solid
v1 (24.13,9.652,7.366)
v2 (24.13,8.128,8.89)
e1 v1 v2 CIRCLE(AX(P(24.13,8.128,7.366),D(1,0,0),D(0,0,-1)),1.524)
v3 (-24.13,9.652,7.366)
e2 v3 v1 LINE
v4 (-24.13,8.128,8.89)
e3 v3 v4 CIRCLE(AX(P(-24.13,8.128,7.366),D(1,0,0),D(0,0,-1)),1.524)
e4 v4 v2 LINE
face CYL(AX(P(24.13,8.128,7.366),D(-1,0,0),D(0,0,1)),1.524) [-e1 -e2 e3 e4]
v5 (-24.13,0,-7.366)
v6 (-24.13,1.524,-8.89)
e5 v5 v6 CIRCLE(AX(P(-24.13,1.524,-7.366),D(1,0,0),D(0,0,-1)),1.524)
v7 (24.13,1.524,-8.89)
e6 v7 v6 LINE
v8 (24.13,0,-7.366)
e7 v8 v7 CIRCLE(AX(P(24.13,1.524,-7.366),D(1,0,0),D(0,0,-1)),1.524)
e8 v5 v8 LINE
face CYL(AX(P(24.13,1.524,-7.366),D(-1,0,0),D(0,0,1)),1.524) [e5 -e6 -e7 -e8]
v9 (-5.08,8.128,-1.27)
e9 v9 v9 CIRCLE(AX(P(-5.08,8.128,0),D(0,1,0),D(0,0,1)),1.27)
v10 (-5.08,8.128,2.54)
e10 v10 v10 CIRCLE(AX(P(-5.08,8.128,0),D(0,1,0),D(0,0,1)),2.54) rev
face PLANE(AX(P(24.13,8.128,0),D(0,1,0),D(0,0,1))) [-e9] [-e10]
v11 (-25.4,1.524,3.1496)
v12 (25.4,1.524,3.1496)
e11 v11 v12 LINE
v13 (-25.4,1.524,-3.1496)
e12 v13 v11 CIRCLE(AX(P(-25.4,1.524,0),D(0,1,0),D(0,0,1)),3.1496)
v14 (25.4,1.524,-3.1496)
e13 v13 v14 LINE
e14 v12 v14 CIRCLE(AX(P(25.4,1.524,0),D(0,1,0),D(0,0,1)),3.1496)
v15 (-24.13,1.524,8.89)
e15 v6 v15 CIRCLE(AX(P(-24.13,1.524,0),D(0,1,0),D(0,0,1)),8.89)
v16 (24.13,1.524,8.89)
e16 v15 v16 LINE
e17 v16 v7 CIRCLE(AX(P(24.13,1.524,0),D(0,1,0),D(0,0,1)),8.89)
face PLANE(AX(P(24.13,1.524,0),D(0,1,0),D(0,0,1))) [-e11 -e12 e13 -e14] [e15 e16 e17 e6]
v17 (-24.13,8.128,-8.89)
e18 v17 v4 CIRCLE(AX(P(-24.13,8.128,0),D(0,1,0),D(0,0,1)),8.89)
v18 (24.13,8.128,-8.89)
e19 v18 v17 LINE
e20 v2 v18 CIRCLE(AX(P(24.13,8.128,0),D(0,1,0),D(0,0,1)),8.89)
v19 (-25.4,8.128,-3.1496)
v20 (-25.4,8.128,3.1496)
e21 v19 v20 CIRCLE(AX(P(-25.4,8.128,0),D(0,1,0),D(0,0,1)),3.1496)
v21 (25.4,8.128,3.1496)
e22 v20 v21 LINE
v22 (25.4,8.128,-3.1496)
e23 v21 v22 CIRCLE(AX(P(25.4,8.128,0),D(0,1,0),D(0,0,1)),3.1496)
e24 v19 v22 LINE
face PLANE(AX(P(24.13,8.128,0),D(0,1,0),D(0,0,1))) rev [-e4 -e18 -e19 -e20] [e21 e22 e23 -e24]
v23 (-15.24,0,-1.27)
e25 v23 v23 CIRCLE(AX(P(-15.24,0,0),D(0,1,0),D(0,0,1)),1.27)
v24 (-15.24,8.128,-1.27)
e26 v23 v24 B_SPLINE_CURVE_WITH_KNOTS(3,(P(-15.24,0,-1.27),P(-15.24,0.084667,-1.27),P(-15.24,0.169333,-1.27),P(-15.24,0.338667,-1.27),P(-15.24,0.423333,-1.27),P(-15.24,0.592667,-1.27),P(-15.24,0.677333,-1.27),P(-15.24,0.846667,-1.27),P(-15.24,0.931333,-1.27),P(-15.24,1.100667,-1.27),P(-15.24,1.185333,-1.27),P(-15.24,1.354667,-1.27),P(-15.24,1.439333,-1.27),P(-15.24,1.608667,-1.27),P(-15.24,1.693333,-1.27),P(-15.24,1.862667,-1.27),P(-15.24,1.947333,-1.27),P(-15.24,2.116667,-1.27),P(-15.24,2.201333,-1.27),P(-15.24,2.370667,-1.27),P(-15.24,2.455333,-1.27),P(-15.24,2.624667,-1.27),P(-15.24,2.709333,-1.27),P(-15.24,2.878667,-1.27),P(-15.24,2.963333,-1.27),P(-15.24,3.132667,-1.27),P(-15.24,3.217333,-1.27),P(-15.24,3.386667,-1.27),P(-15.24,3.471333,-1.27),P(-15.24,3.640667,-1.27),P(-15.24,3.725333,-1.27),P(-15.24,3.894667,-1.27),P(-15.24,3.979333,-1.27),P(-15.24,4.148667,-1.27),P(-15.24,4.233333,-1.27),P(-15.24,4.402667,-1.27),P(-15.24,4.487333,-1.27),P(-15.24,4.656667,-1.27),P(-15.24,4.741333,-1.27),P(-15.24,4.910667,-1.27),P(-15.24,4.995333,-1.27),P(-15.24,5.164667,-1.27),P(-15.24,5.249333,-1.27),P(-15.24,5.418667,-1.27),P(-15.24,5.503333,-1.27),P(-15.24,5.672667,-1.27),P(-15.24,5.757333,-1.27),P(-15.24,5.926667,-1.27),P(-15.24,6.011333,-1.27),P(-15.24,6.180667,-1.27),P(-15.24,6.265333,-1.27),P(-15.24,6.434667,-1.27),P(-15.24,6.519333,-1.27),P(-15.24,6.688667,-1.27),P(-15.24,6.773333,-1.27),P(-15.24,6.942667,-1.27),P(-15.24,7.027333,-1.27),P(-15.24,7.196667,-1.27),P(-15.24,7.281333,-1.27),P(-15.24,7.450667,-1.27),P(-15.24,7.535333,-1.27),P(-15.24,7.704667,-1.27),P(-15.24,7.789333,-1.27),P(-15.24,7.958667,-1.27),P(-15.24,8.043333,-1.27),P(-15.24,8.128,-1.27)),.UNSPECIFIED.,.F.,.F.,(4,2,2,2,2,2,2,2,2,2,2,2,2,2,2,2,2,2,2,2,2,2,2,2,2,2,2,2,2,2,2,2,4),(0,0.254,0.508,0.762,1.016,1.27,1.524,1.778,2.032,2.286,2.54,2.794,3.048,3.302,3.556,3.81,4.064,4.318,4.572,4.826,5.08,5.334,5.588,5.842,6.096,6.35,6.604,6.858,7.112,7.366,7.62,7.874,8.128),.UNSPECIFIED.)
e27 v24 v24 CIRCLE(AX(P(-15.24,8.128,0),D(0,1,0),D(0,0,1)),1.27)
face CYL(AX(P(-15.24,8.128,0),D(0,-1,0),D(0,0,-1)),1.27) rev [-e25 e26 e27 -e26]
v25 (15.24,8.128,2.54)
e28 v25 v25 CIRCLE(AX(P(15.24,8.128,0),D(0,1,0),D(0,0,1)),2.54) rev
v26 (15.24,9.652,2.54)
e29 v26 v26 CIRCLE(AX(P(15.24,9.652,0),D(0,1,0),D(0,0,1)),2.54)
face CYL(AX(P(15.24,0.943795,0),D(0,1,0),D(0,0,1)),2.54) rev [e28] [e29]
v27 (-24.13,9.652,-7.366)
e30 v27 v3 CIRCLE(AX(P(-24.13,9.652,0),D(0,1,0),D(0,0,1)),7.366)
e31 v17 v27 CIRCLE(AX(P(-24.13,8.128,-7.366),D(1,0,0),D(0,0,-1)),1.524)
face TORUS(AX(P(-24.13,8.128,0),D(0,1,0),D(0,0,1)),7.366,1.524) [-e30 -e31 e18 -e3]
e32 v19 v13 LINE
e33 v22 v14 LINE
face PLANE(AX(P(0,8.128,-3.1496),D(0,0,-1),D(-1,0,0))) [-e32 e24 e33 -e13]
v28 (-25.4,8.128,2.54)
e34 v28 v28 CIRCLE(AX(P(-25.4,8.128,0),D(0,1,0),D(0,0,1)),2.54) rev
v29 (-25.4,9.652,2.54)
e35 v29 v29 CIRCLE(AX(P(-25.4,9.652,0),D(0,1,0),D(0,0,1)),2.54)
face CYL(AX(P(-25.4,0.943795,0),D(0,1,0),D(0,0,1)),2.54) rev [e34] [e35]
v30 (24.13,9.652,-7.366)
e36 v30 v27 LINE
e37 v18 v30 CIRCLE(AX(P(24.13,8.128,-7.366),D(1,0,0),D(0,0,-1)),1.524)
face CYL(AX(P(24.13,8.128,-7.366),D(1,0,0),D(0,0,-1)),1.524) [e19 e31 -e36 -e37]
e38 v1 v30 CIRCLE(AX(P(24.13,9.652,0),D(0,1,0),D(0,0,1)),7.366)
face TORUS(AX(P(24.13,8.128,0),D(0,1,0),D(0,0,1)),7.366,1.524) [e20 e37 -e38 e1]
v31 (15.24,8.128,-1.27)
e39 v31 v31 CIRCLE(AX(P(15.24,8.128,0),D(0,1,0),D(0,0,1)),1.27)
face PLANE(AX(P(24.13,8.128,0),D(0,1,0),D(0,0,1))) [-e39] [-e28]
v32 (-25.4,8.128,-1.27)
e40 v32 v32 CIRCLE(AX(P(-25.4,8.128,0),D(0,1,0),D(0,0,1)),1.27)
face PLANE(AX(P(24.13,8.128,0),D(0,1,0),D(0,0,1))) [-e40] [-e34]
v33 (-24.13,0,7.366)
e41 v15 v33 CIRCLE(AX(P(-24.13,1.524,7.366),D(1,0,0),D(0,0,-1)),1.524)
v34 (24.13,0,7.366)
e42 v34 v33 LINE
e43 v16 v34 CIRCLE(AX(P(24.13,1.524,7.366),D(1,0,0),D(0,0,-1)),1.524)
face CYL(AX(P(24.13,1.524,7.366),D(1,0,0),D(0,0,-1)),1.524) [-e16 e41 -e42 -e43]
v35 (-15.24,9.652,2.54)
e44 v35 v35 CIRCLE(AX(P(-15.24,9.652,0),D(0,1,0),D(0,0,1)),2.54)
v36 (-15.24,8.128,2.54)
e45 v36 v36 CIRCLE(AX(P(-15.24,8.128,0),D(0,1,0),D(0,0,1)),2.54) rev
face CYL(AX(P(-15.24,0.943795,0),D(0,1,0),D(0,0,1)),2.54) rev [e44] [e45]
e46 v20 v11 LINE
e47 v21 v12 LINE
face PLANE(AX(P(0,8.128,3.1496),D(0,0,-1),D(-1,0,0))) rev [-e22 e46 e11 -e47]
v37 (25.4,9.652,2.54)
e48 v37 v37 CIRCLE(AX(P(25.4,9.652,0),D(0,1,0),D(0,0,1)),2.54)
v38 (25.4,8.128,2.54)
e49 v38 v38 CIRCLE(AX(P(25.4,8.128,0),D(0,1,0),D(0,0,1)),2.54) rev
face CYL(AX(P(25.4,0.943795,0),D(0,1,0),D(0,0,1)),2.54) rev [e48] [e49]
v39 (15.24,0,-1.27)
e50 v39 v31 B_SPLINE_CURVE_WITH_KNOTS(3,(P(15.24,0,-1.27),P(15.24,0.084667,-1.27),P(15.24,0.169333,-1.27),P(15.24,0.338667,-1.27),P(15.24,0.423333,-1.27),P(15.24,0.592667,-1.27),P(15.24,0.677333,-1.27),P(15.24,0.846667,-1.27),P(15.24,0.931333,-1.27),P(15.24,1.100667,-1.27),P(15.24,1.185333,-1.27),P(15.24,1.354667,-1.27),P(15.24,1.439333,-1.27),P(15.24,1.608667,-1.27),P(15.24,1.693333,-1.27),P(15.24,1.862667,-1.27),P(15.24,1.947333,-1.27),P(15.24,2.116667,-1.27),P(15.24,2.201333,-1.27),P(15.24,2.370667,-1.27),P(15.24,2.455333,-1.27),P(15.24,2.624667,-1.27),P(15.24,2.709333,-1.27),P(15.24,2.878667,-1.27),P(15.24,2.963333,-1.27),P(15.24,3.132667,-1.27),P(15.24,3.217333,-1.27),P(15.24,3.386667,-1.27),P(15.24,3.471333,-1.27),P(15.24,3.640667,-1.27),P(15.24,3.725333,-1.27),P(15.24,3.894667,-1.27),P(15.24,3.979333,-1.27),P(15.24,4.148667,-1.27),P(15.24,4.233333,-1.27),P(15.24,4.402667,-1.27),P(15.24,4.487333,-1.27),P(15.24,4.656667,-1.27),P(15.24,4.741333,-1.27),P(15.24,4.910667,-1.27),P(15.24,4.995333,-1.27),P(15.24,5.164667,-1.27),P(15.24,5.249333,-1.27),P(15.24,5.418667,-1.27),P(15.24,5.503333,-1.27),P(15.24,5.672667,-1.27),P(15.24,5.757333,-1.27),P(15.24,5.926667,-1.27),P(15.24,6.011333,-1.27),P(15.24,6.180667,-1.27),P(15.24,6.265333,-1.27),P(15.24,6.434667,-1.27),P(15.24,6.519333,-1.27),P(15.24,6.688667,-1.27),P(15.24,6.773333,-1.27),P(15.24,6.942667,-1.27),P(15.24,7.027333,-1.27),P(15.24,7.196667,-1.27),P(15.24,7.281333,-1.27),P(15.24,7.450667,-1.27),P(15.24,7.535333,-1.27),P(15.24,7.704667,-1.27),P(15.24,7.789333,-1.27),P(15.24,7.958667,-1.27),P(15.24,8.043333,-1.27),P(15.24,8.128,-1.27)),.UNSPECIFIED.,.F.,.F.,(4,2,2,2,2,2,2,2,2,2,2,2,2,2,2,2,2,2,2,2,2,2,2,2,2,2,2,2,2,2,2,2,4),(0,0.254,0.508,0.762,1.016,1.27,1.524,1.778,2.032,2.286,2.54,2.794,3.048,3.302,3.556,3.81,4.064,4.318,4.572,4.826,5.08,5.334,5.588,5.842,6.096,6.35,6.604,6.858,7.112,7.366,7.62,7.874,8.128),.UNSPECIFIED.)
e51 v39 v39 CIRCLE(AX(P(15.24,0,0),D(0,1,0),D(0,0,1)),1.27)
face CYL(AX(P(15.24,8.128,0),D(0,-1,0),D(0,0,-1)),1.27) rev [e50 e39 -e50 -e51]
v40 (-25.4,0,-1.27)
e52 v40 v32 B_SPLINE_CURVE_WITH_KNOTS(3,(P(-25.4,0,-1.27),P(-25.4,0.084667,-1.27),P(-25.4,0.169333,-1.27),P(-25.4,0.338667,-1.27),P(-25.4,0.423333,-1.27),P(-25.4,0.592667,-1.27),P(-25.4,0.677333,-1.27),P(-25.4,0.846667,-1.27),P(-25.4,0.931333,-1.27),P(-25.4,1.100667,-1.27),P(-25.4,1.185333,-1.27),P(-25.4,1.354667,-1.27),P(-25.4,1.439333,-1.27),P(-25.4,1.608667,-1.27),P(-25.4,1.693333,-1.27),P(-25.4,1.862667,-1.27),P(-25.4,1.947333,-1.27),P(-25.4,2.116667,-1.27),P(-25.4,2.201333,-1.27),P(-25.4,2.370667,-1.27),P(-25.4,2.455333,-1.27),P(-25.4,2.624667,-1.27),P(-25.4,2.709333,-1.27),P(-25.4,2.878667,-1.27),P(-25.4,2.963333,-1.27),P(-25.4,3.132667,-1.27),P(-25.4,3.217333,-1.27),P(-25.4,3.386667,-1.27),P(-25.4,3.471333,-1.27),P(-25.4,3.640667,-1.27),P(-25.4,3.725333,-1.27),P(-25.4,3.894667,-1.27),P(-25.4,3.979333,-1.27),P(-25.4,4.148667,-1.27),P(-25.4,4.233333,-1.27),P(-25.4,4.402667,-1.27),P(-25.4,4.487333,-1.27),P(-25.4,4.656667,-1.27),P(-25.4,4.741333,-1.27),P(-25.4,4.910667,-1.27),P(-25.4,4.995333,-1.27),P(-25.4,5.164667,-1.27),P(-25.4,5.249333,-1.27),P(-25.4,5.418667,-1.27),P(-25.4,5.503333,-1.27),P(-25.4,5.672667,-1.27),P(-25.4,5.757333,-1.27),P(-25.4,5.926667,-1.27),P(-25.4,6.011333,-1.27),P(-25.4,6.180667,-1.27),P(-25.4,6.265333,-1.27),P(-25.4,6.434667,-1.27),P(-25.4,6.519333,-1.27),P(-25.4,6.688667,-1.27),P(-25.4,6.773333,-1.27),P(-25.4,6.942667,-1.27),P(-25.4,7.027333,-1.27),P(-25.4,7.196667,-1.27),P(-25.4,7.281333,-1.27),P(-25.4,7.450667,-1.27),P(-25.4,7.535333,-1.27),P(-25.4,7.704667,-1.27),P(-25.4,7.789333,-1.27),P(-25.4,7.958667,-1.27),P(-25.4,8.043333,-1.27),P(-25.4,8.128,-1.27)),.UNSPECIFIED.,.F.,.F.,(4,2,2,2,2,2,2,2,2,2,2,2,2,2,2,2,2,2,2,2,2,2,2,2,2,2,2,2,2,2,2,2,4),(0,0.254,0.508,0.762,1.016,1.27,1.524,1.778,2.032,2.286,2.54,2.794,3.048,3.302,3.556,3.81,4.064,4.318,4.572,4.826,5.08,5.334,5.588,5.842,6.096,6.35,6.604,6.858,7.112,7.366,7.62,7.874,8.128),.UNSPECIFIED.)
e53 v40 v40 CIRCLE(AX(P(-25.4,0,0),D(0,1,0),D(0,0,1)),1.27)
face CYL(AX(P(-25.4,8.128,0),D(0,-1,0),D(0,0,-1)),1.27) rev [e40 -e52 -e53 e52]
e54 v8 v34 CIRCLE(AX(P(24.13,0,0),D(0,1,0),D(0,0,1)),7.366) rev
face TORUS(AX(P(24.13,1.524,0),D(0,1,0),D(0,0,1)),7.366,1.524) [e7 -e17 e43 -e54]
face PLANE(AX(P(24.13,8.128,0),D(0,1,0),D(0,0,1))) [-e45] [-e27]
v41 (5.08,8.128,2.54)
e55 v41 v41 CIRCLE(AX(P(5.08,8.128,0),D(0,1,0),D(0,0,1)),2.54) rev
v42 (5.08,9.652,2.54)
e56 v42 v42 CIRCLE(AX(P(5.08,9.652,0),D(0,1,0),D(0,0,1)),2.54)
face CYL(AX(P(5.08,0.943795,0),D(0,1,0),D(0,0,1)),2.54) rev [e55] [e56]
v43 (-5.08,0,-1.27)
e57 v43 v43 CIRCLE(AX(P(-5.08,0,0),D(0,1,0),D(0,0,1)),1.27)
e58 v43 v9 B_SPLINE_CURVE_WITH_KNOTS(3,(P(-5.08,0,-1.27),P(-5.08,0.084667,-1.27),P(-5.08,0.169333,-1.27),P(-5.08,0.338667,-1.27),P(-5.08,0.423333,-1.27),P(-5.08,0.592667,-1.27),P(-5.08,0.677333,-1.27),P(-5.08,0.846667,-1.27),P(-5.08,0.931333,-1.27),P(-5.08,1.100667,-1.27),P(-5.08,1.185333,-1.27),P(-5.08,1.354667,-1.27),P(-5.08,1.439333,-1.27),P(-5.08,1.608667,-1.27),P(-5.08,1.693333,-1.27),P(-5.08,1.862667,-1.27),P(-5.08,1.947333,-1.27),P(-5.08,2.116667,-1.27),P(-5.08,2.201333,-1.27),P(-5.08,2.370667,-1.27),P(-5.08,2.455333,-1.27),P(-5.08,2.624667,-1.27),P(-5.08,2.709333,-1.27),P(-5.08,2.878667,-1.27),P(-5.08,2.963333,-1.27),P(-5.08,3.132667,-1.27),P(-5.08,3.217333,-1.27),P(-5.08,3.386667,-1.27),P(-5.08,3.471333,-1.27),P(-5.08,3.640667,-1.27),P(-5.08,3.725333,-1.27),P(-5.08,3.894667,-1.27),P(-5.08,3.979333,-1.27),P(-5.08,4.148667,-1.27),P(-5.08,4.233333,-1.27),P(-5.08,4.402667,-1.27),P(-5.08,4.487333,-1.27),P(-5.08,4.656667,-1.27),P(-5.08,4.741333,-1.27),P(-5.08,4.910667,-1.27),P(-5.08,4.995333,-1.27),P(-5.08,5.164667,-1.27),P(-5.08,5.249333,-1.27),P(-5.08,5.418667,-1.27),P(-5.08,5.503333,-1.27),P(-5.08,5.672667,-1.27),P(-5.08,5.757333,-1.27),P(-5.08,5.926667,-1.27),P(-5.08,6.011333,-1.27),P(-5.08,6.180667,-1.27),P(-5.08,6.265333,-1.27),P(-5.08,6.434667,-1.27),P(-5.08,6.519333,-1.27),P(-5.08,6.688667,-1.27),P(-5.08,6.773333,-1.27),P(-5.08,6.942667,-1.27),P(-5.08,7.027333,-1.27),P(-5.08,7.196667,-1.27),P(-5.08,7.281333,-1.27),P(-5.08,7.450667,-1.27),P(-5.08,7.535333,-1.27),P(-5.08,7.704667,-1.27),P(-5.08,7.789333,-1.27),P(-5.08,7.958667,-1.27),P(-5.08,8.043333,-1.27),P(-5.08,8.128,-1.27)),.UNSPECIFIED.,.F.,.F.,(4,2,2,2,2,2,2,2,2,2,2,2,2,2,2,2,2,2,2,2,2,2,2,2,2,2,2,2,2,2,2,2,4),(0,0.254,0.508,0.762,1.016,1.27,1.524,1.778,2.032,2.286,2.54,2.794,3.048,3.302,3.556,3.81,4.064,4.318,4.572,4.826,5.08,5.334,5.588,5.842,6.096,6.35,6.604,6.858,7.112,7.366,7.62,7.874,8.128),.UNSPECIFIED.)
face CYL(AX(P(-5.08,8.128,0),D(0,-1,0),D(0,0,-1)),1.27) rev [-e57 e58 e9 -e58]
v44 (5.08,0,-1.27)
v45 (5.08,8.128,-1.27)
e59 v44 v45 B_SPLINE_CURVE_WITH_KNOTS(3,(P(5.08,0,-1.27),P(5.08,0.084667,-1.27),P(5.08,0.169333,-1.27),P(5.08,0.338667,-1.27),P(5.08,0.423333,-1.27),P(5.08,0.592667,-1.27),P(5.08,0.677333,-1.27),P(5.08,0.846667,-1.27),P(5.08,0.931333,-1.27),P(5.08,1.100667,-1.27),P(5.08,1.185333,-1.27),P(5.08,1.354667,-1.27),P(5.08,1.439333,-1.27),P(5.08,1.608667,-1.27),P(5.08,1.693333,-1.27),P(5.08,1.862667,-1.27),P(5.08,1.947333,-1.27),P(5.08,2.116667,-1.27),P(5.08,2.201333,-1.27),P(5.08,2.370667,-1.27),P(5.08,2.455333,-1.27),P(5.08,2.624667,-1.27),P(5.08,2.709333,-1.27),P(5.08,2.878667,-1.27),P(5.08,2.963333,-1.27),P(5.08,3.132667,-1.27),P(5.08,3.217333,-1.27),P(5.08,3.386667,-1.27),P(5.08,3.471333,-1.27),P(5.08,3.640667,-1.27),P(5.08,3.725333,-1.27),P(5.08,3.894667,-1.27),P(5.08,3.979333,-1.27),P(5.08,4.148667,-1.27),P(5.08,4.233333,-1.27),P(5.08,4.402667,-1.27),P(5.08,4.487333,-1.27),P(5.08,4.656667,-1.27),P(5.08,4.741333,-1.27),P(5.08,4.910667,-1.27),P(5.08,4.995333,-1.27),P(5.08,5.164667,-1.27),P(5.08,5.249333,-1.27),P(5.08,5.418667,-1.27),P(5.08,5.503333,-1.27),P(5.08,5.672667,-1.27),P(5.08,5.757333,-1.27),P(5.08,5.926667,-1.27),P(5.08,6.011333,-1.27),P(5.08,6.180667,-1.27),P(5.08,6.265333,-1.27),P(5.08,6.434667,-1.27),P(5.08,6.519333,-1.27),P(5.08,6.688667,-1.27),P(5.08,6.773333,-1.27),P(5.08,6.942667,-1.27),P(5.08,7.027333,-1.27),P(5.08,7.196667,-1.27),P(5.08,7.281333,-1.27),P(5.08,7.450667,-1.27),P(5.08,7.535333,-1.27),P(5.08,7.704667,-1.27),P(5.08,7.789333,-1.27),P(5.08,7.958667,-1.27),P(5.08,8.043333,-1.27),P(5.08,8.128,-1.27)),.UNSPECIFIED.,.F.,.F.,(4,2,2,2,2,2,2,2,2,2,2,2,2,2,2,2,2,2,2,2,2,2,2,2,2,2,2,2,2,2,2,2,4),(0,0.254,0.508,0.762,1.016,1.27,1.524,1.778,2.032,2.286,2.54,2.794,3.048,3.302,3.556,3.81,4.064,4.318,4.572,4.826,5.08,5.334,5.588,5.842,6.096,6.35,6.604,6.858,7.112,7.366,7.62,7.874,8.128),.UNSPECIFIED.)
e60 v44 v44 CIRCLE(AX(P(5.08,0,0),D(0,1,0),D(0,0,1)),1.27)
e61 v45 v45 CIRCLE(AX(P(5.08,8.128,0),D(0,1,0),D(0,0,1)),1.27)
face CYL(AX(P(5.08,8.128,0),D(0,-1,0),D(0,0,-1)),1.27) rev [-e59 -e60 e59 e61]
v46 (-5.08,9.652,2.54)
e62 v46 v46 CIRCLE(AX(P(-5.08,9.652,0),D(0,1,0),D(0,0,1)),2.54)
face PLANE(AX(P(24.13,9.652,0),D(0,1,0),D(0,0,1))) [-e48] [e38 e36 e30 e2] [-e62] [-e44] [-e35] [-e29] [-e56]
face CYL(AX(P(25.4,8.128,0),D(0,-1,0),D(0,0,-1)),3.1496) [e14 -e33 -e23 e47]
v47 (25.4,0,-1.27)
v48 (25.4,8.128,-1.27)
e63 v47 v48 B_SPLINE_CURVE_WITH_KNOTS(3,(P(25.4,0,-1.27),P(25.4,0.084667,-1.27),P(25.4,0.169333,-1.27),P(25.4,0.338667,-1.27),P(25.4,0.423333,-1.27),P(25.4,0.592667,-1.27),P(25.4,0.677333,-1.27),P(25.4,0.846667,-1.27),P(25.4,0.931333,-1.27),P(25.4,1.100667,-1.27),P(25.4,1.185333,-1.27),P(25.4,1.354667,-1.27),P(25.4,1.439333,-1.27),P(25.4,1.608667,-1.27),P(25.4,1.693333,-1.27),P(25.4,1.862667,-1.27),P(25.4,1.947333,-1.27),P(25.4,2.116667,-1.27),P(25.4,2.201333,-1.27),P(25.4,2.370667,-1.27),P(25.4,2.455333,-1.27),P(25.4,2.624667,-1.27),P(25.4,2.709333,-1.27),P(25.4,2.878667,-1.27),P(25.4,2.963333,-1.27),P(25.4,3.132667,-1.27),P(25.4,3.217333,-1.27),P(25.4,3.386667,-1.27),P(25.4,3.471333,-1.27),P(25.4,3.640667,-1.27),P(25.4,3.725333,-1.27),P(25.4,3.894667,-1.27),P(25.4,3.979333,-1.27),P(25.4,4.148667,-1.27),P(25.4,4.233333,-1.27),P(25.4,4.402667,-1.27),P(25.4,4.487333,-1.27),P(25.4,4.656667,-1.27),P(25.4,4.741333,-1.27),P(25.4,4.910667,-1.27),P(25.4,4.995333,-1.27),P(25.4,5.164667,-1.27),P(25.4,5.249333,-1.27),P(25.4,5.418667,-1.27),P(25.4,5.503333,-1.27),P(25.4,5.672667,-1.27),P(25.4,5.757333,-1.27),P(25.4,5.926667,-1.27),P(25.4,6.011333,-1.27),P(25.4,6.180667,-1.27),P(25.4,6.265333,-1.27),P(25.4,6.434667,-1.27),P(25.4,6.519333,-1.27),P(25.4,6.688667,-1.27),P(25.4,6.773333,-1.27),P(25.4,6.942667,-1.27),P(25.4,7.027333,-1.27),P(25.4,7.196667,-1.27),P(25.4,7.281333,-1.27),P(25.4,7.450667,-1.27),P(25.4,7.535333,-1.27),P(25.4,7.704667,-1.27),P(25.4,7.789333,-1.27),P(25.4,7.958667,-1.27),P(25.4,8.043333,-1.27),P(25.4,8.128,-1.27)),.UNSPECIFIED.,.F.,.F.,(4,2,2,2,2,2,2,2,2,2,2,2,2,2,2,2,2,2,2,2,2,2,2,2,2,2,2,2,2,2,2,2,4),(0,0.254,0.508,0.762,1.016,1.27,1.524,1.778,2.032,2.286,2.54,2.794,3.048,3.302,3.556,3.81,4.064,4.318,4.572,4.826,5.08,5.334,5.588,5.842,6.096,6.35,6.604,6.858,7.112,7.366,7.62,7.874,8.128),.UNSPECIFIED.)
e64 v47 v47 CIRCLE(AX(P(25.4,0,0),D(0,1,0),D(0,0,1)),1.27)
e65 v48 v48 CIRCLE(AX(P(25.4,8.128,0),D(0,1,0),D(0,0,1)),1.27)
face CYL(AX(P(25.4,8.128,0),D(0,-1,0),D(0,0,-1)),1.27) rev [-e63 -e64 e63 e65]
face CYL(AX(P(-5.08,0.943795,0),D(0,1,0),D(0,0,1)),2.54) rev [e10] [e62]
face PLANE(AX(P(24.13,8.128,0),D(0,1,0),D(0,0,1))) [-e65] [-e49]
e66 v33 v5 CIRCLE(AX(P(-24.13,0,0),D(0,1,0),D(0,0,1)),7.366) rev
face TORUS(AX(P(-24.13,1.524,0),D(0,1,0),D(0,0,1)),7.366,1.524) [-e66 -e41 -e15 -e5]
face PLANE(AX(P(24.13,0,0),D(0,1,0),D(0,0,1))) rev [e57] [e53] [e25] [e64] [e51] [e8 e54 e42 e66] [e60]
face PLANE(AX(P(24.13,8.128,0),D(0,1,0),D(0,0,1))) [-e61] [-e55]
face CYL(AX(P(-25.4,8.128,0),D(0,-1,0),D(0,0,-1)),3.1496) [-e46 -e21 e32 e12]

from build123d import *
from build123d.topology import SkipClean

# Parameters (mm, degrees)
BOSS_EXTRUDE1_DEPTH     = 1.524
SKETCH2_R               = 1.2700000000000011
BOSS_EXTRUDE2_DEPTH     = 6.603999999999999
BOSS_EXTRUDE3_DEPTH     = 1.524
FILLET1_R               = 1.524
CUT_EXTRUDE1_DEPTH      = 36.14849760658342
CUT_EXTRUDE1_DEPTH_BACK = 36.14849760658342
SKETCH2_3_R             = 1.2700000000000011
CUT_EXTRUDE2_DEPTH      = 36.53186744318402
CUT_EXTRUDE2_DEPTH_BACK = 1.524
SKETCH4_R               = 2.539999999999999


with BuildPart() as part:
    # Sketch1 → Boss-Extrude1 (new body)
    with BuildSketch(Plane(origin=(0, 0, 0), x_dir=(1, 0, 0), z_dir=(0, 1, 0))):
        with BuildLine():
            Line((24.13, -8.88999999999999), (-24.13, -8.889999999999995))
            ThreePointArc((-24.13, -8.889999999999995), (-33.019999999999996, 2.78e-15), (-24.130000000000003, 8.89))
            Line((-24.130000000000003, 8.89), (24.130000000000003, 8.890000000000006))
            ThreePointArc((24.130000000000003, 8.890000000000006), (33.02, 8.03e-15), (24.13, -8.88999999999999))
        make_face()
    extrude(amount=BOSS_EXTRUDE1_DEPTH)

    # Sketch2 → Boss-Extrude2 (add)
    # profile 1 of 35: a face of its own
    with BuildSketch(Plane(origin=(0, 1.524, 0), x_dir=(1, 0, 0), z_dir=(0, 1, 0))):
        with BuildLine():
            ThreePointArc((-22.64366109485788, 1.5239999999999858), (-23.80000160000079, 2.7129292803167524), (-25.399999999999995, 3.1495999999999986))
            ThreePointArc((-25.399999999999995, 3.1495999999999986), (-28.549599999999995, 3.9e-16), (-25.399999999999995, -3.1495999999999986))
            ThreePointArc((-25.399999999999995, -3.1495999999999986), (-23.80000160000079, -2.7129292803167524), (-22.64366109485788, -1.5239999999999856))
            Line((-22.643661094857876, -1.5239999999999954), (-25.4, -1.5239999999999954))
            Line((-25.4, -1.5239999999999954), (-25.4, -1.2700000000000011))
            ThreePointArc((-25.40000000000001, -1.2700000000000011), (-26.669999999999995, -9.7e-16), (-25.400000000000013, 1.2700000000000011))
            Line((-25.4, 1.2700000000000011), (-25.4, 1.5239999999999954))
            Line((-25.4, 1.5239999999999954), (-22.643661094857876, 1.5239999999999954))
        make_face()
    # profile 2 of 35: a face of its own
    with BuildSketch(Plane(origin=(0, 1.524, 0), x_dir=(1, 0, 0), z_dir=(0, 1, 0))):
        with BuildLine():
            ThreePointArc((-22.250399999999996, 0), (-22.350299590481413, 0.7869609724644511), (-22.64366109485788, 1.5239999999999858))
            Line((-22.643661094857876, 1.5239999999999954), (-25.4, 1.5239999999999954))
            Line((-25.4, 1.5239999999999954), (-25.4, 1.2700000000000011))
            ThreePointArc((-25.400000000000013, 1.2700000000000011), (-24.501974387893085, 0.8980256121069224), (-24.129999999999995, 0))
            ThreePointArc((-24.129999999999995, -3.1e-16), (-24.501974387893085, -0.898025612106922), (-25.40000000000001, -1.2700000000000011))
            Line((-25.4, -1.2700000000000011), (-25.4, -1.5239999999999954))
            Line((-25.4, -1.5239999999999954), (-22.643661094857876, -1.5239999999999954))
            ThreePointArc((-22.64366109485788, -1.5239999999999856), (-22.350299590481413, -0.7869609724644512), (-22.250399999999996, -7.7e-16))
        make_face()
    # profile 3 of 35: a face of its own
    with BuildSketch(Plane(origin=(0, 1.524, 0), x_dir=(1, 0, 0), z_dir=(0, 1, 0))):
        with BuildLine():
            Line((-15.239999999999851, 3.149599999999998), (-25.399999999999995, 3.149599999999998))
            ThreePointArc((-25.399999999999995, 3.1495999999999986), (-23.80000160000079, 2.7129292803167524), (-22.64366109485788, 1.5239999999999858))
            Line((-22.643661094857876, 1.5239999999999954), (-17.99633890514213, 1.5239999999999954))
            ThreePointArc((-17.99633890514212, 1.5239999999999714), (-16.839998399999146, 2.712929280316786), (-15.239999999999851, 3.1496000000000004))
        make_face()
    # profile 4 of 35: a face of its own
    with BuildSketch(Plane(origin=(0, 1.524, 0), x_dir=(1, 0, 0), z_dir=(0, 1, 0))):
        with BuildLine():
            Line((-17.99633890514213, 1.5239999999999954), (-22.643661094857876, 1.5239999999999954))
            ThreePointArc((-22.64366109485788, 1.5239999999999858), (-22.350299590481413, 0.7869609724644511), (-22.250399999999996, 0))
            ThreePointArc((-22.250399999999996, -7.7e-16), (-22.350299590481413, -0.7869609724644512), (-22.64366109485788, -1.5239999999999856))
            Line((-22.643661094857876, -1.5239999999999954), (-17.99633890514213, -1.5239999999999954))
            ThreePointArc((-17.99633890514212, -1.5239999999999694), (-18.389599999999994, 3.9e-16), (-17.99633890514212, 1.5239999999999714))
        make_face()
    # profile 5 of 35: a face of its own
    with BuildSketch(Plane(origin=(0, 1.524, 0), x_dir=(1, 0, 0), z_dir=(0, 1, 0))):
        with BuildLine():
            ThreePointArc((-22.64366109485788, 1.5239999999999858), (-23.80000160000079, 2.7129292803167524), (-25.399999999999995, 3.1495999999999986))
            ThreePointArc((-25.399999999999995, 3.1495999999999986), (-28.549599999999995, 3.9e-16), (-25.399999999999995, -3.1495999999999986))
            ThreePointArc((-25.399999999999995, -3.1495999999999986), (-23.80000160000079, -2.7129292803167524), (-22.64366109485788, -1.5239999999999856))
            Line((-22.643661094857876, -1.5239999999999954), (-25.4, -1.5239999999999954))
            Line((-25.4, -1.5239999999999954), (-25.4, -1.2700000000000011))
            ThreePointArc((-25.40000000000001, -1.2700000000000011), (-26.669999999999995, -9.7e-16), (-25.400000000000013, 1.2700000000000011))
            Line((-25.4, 1.2700000000000011), (-25.4, 1.5239999999999954))
            Line((-25.4, 1.5239999999999954), (-22.643661094857876, 1.5239999999999954))
        make_face()
    # profile 6 of 35: a face of its own
    with BuildSketch(Plane(origin=(0, 1.524, 0), x_dir=(1, 0, 0), z_dir=(0, 1, 0))):
        with BuildLine():
            ThreePointArc((-22.250399999999996, 0), (-22.350299590481413, 0.7869609724644511), (-22.64366109485788, 1.5239999999999858))
            Line((-22.643661094857876, 1.5239999999999954), (-25.4, 1.5239999999999954))
            Line((-25.4, 1.5239999999999954), (-25.4, 1.2700000000000011))
            ThreePointArc((-25.400000000000013, 1.2700000000000011), (-24.501974387893085, 0.8980256121069224), (-24.129999999999995, 0))
            ThreePointArc((-24.129999999999995, -3.1e-16), (-24.501974387893085, -0.898025612106922), (-25.40000000000001, -1.2700000000000011))
            Line((-25.4, -1.2700000000000011), (-25.4, -1.5239999999999954))
            Line((-25.4, -1.5239999999999954), (-22.643661094857876, -1.5239999999999954))
            ThreePointArc((-22.64366109485788, -1.5239999999999856), (-22.350299590481413, -0.7869609724644512), (-22.250399999999996, -7.7e-16))
        make_face()
    # profile 7 of 35: a face of its own
    with BuildSketch(Plane(origin=(0, 1.524, 0), x_dir=(1, 0, 0), z_dir=(0, 1, 0))):
        with BuildLine():
            ThreePointArc((-22.64366109485788, -1.5239999999999856), (-23.80000160000079, -2.7129292803167524), (-25.399999999999995, -3.1495999999999986))
            Line((-25.399999999999995, -3.149599999999998), (-15.239999999999842, -3.149599999999998))
            ThreePointArc((-15.239999999999844, -3.1496000000000004), (-16.839998399999146, -2.7129292803167875), (-17.99633890514212, -1.5239999999999694))
            Line((-17.99633890514213, -1.5239999999999954), (-22.643661094857876, -1.5239999999999954))
        make_face()
    # profile 8 of 35: a face of its own
    with BuildSketch(Plane(origin=(0, 1.524, 0), x_dir=(1, 0, 0), z_dir=(0, 1, 0))):
        with BuildLine():
            ThreePointArc((-17.99633890514212, -1.5239999999999694), (-16.839998399999146, -2.7129292803167875), (-15.239999999999844, -3.1496000000000004))
            ThreePointArc((-15.239999999999844, -3.1496000000000004), (-13.640001600000728, -2.7129292803167186), (-12.483661094857885, -1.5239999999999987))
            Line((-12.483661094857887, -1.5239999999999954), (-17.99633890514213, -1.5239999999999954))
        make_face()
    # profile 9 of 35: a face of its own
    with BuildSketch(Plane(origin=(0, 1.524, 0), x_dir=(1, 0, 0), z_dir=(0, 1, 0))):
        with BuildLine():
            ThreePointArc((-12.090399999999995, 0), (-12.190299590481414, 0.7869609724644582), (-12.483661094857885, 1.523999999999999))
            Line((-12.483661094857887, 1.5239999999999954), (-17.99633890514213, 1.5239999999999954))
            ThreePointArc((-17.99633890514212, 1.5239999999999714), (-18.389599999999994, 3.9e-16), (-17.99633890514212, -1.5239999999999694))
            Line((-17.99633890514213, -1.5239999999999954), (-12.483661094857887, -1.5239999999999954))
            ThreePointArc((-12.483661094857885, -1.5239999999999987), (-12.190299590481414, -0.7869609724644571), (-12.090399999999995, -7.7e-16))
        make_face()
        with Locations(Location((-15.239999999999995, 0, 0), (0, 0, 90))):
            Circle(SKETCH2_R, mode=Mode.SUBTRACT)
    # profile 10 of 35: a face of its own
    with BuildSketch(Plane(origin=(0, 1.524, 0), x_dir=(1, 0, 0), z_dir=(0, 1, 0))):
        with BuildLine():
            ThreePointArc((-12.483661094857885, 1.523999999999999), (-13.640001600000732, 2.712929280316721), (-15.239999999999853, 3.1496000000000004))
            ThreePointArc((-15.239999999999851, 3.1496000000000004), (-16.839998399999146, 2.712929280316786), (-17.99633890514212, 1.5239999999999714))
            Line((-17.99633890514213, 1.5239999999999954), (-12.483661094857887, 1.5239999999999954))
        make_face()
    # profile 11 of 35: a face of its own
    with BuildSketch(Plane(origin=(0, 1.524, 0), x_dir=(1, 0, 0), z_dir=(0, 1, 0))):
        with BuildLine():
            Line((-5.080000024231023, 3.149599999999998), (-15.239999999999851, 3.149599999999998))
            ThreePointArc((-15.239999999999853, 3.1496000000000004), (-13.640001600000732, 2.712929280316721), (-12.483661094857885, 1.523999999999999))
            Line((-12.483661094857887, 1.5239999999999954), (-7.836338905142128, 1.5239999999999954))
            ThreePointArc((-7.836338905142118, 1.5239999999999725), (-6.679998410434988, 2.712929274162062), (-5.0800000242310235, 3.1496))
        make_face()
    # profile 12 of 35: a face of its own
    with BuildSketch(Plane(origin=(0, 1.524, 0), x_dir=(1, 0, 0), z_dir=(0, 1, 0))):
        with BuildLine():
            Line((-7.836338905142128, 1.5239999999999954), (-12.483661094857887, 1.5239999999999954))
            ThreePointArc((-12.483661094857885, 1.523999999999999), (-12.190299590481414, 0.7869609724644582), (-12.090399999999995, 0))
            ThreePointArc((-12.090399999999995, -7.7e-16), (-12.190299590481414, -0.7869609724644571), (-12.483661094857885, -1.5239999999999987))
            Line((-12.483661094857887, -1.5239999999999954), (-7.836338905142128, -1.5239999999999954))
            ThreePointArc((-7.836338905142119, -1.5239999999999716), (-8.229599999999994, 3.9e-16), (-7.836338905142118, 1.5239999999999725))
        make_face()
    # profile 13 of 35: a face of its own
    with BuildSketch(Plane(origin=(0, 1.524, 0), x_dir=(1, 0, 0), z_dir=(0, 1, 0))):
        with BuildLine():
            ThreePointArc((-12.483661094857885, -1.5239999999999987), (-13.640001600000728, -2.7129292803167186), (-15.239999999999844, -3.1496000000000004))
            Line((-15.239999999999842, -3.149599999999998), (-5.080000009255329, -3.149599999999998))
            ThreePointArc((-5.080000009255329, -3.1496), (-6.67999840398528, -2.712929277965892), (-7.836338905142119, -1.5239999999999716))
            Line((-7.836338905142128, -1.5239999999999954), (-12.483661094857887, -1.5239999999999954))
        make_face()
    # profile 14 of 35: a face of its own
    with BuildSketch(Plane(origin=(0, 1.524, 0), x_dir=(1, 0, 0), z_dir=(0, 1, 0))):
        with BuildLine():
            ThreePointArc((-7.836338905142119, -1.5239999999999716), (-6.67999840398528, -2.712929277965892), (-5.080000009255329, -3.1496))
            ThreePointArc((-5.080000009255329, -3.1496), (-3.480001603986866, -2.7129292826676146), (-2.323661094857884, -1.5239999999999985))
            Line((-2.323661094857883, -1.5239999999999954), (-7.836338905142128, -1.5239999999999954))
        make_face()
    # profile 15 of 35: a face of its own
    with BuildSketch(Plane(origin=(0, 1.524, 0), x_dir=(1, 0, 0), z_dir=(0, 1, 0))):
        with BuildLine():
            ThreePointArc((-1.930399999999994, 0), (-2.030299590481414, 0.7869609724644581), (-2.323661094857884, 1.5239999999999987))
            Line((-2.3236610948578864, 1.5239999999999954), (-7.836338905142128, 1.5239999999999954))
            ThreePointArc((-7.836338905142118, 1.5239999999999725), (-8.229599999999994, 3.9e-16), (-7.836338905142119, -1.5239999999999716))
            Line((-7.836338905142128, -1.5239999999999954), (-2.323661094857883, -1.5239999999999954))
            ThreePointArc((-2.323661094857884, -1.5239999999999985), (-2.030299590481414, -0.786960972464457), (-1.930399999999994, -7.7e-16))
        make_face()
        with Locations(Location((-5.079999999999994, 0, 0), (0, 0, 90))):
            Circle(SKETCH2_R, mode=Mode.SUBTRACT)
    # profile 16 of 35: a face of its own
    with BuildSketch(Plane(origin=(0, 1.524, 0), x_dir=(1, 0, 0), z_dir=(0, 1, 0))):
        with BuildLine():
            ThreePointArc((-2.323661094857884, 1.5239999999999987), (-3.480001610436574, 2.7129292864714447), (-5.0800000242310235, 3.1496))
            ThreePointArc((-5.0800000242310235, 3.1496), (-6.679998410434988, 2.712929274162062), (-7.836338905142118, 1.5239999999999725))
            Line((-7.836338905142128, 1.5239999999999954), (-2.3236610948578864, 1.5239999999999954))
        make_face()
    # profile 17 of 35: a face of its own
    with BuildSketch(Plane(origin=(0, 1.524, 0), x_dir=(1, 0, 0), z_dir=(0, 1, 0))):
        with BuildLine():
            Line((5.079999990744664, 3.149599999999998), (-5.080000024231023, 3.149599999999998))
            ThreePointArc((-5.0800000242310235, 3.1496), (-3.480001610436574, 2.7129292864714447), (-2.323661094857884, 1.5239999999999987))
            Line((-2.3236610948578864, 1.5239999999999954), (2.3236610948578758, 1.5239999999999954))
            ThreePointArc((2.323661094857882, 1.523999999999973), (3.4800015960147173, 2.71292927796589), (5.079999990744665, 3.1495999999999986))
        make_face()
    # profile 18 of 35: a face of its own
    with BuildSketch(Plane(origin=(0, 1.524, 0), x_dir=(1, 0, 0), z_dir=(0, 1, 0))):
        with BuildLine():
            Line((2.3236610948578758, 1.5239999999999954), (-2.3236610948578864, 1.5239999999999954))
            ThreePointArc((-2.323661094857884, 1.5239999999999987), (-2.030299590481414, 0.7869609724644581), (-1.930399999999994, 0))
            ThreePointArc((-1.930399999999994, -7.7e-16), (-2.030299590481414, -0.786960972464457), (-2.323661094857884, -1.5239999999999985))
            Line((-2.323661094857883, -1.5239999999999954), (2.323661094857872, -1.5239999999999954))
            ThreePointArc((2.3236610948578815, -1.5239999999999723), (1.930400000000006, 3.9e-16), (2.323661094857882, 1.523999999999973))
        make_face()
    # profile 19 of 35: a face of its own
    with BuildSketch(Plane(origin=(0, 1.524, 0), x_dir=(1, 0, 0), z_dir=(0, 1, 0))):
        with BuildLine():
            ThreePointArc((-2.323661094857884, -1.5239999999999985), (-3.480001603986866, -2.7129292826676146), (-5.080000009255329, -3.1496))
            Line((-5.080000009255329, -3.149599999999998), (5.079999980654623, -3.149599999999998))
            ThreePointArc((5.079999980654621, -3.1495999999999986), (3.4800015916691547, -2.712929275403017), (2.3236610948578815, -1.5239999999999723))
            Line((2.323661094857872, -1.5239999999999954), (-2.323661094857883, -1.5239999999999954))
        make_face()
    # profile 20 of 35: a face of its own
    with BuildSketch(Plane(origin=(0, 1.524, 0), x_dir=(1, 0, 0), z_dir=(0, 1, 0))):
        with BuildLine():
            ThreePointArc((2.3236610948578815, -1.5239999999999723), (3.4800015916691547, -2.712929275403017), (5.079999980654621, -3.1495999999999986))
            ThreePointArc((5.079999980654621, -3.1495999999999986), (6.679998391667567, -2.7129292852304876), (7.836338905142113, -1.5239999999999978))
            Line((7.836338905142114, -1.5239999999999954), (2.323661094857872, -1.5239999999999954))
        make_face()
    # profile 21 of 35: a face of its own
    with BuildSketch(Plane(origin=(0, 1.524, 0), x_dir=(1, 0, 0), z_dir=(0, 1, 0))):
        with BuildLine():
            ThreePointArc((8.229600000000003, 0), (8.129700409518584, 0.7869609724644577), (7.836338905142113, 1.523999999999998))
            Line((7.836338905142114, 1.5239999999999954), (2.3236610948578758, 1.5239999999999954))
            ThreePointArc((2.323661094857882, 1.523999999999973), (1.930400000000006, 3.9e-16), (2.3236610948578815, -1.5239999999999723))
            Line((2.323661094857872, -1.5239999999999954), (7.836338905142114, -1.5239999999999954))
            ThreePointArc((7.836338905142113, -1.5239999999999978), (8.129700409518584, -0.7869609724644566), (8.229600000000003, -7.7e-16))
        make_face()
        with Locations(Location((5.0800000000000045, 0, 0), (0, 0, 90))):
            Circle(SKETCH2_R, mode=Mode.SUBTRACT)
    # profile 22 of 35: a face of its own
    with BuildSketch(Plane(origin=(0, 1.524, 0), x_dir=(1, 0, 0), z_dir=(0, 1, 0))):
        with BuildLine():
            ThreePointArc((7.836338905142113, 1.523999999999998), (6.67999839601313, 2.7129292826676146), (5.079999990744664, 3.1495999999999986))
            ThreePointArc((5.079999990744665, 3.1495999999999986), (3.4800015960147173, 2.71292927796589), (2.323661094857882, 1.523999999999973))
            Line((2.3236610948578758, 1.5239999999999954), (7.836338905142114, 1.5239999999999954))
        make_face()
    # profile 23 of 35: a face of its own
    with BuildSketch(Plane(origin=(0, 1.524, 0), x_dir=(1, 0, 0), z_dir=(0, 1, 0))):
        with BuildLine():
            Line((15.240000006751938, 3.149599999999998), (5.079999990744664, 3.149599999999998))
            ThreePointArc((5.079999990744664, 3.1495999999999986), (6.67999839601313, 2.7129292826676146), (7.836338905142113, 1.523999999999998))
            Line((7.836338905142114, 1.5239999999999954), (12.483661094857876, 1.5239999999999954))
            ThreePointArc((12.483661094857885, 1.523999999999973), (13.640001602908706, 2.7129292820317406), (15.240000006751936, 3.1495999999999986))
        make_face()
    # profile 24 of 35: a face of its own
    with BuildSketch(Plane(origin=(0, 1.524, 0), x_dir=(1, 0, 0), z_dir=(0, 1, 0))):
        with BuildLine():
            Line((12.483661094857876, 1.5239999999999954), (7.836338905142114, 1.5239999999999954))
            ThreePointArc((7.836338905142113, 1.523999999999998), (8.129700409518584, 0.7869609724644577), (8.229600000000003, 0))
            ThreePointArc((8.229600000000003, -7.7e-16), (8.129700409518584, -0.7869609724644566), (7.836338905142113, -1.5239999999999978))
            Line((7.836338905142114, -1.5239999999999954), (12.483661094857876, -1.5239999999999954))
            ThreePointArc((12.483661094857885, -1.5239999999999723), (12.09040000000001, 3.9e-16), (12.483661094857885, 1.523999999999973))
        make_face()
    # profile 25 of 35: a face of its own
    with BuildSketch(Plane(origin=(0, 1.524, 0), x_dir=(1, 0, 0), z_dir=(0, 1, 0))):
        with BuildLine():
            ThreePointArc((7.836338905142113, -1.5239999999999978), (6.679998391667567, -2.7129292852304876), (5.079999980654621, -3.1495999999999986))
            Line((5.079999980654623, -3.149599999999998), (15.240000000000155, -3.149599999999998))
            ThreePointArc((15.240000000000155, -3.1495999999999986), (13.640001600000858, -2.712929280316786), (12.483661094857885, -1.5239999999999723))
            Line((12.483661094857876, -1.5239999999999954), (7.836338905142114, -1.5239999999999954))
        make_face()
    # profile 26 of 35: a face of its own
    with BuildSketch(Plane(origin=(0, 1.524, 0), x_dir=(1, 0, 0), z_dir=(0, 1, 0))):
        with BuildLine():
            ThreePointArc((12.483661094857885, -1.5239999999999723), (13.640001600000858, -2.712929280316786), (15.240000000000155, -3.1495999999999986))
            ThreePointArc((15.240000000000155, -3.1495999999999986), (16.83999839999927, -2.712929280316718), (17.996338905142117, -1.5239999999999978))
            Line((17.996338905142117, -1.5239999999999954), (12.483661094857876, -1.5239999999999954))
        make_face()
    # profile 27 of 35: a face of its own
    with BuildSketch(Plane(origin=(0, 1.524, 0), x_dir=(1, 0, 0), z_dir=(0, 1, 0))):
        with BuildLine():
            ThreePointArc((18.389600000000005, 0), (18.289700409518588, 0.7869609724644582), (17.996338905142117, 1.5239999999999987))
            Line((17.996338905142114, 1.5239999999999954), (12.483661094857876, 1.5239999999999954))
            ThreePointArc((12.483661094857885, 1.523999999999973), (12.09040000000001, 3.9e-16), (12.483661094857885, -1.5239999999999723))
            Line((12.483661094857876, -1.5239999999999954), (17.996338905142117, -1.5239999999999954))
            ThreePointArc((17.996338905142117, -1.5239999999999978), (18.289700409518588, -0.7869609724644566), (18.389600000000005, -7.7e-16))
        make_face()
        with Locations(Location((15.240000000000007, 0, 0), (0, 0, 90))):
            Circle(SKETCH2_R, mode=Mode.SUBTRACT)
    # profile 28 of 35: a face of its own
    with BuildSketch(Plane(origin=(0, 1.524, 0), x_dir=(1, 0, 0), z_dir=(0, 1, 0))):
        with BuildLine():
            ThreePointArc((17.996338905142117, 1.5239999999999987), (16.839998402907117, 2.7129292786017642), (15.240000006751936, 3.1495999999999986))
            ThreePointArc((15.240000006751936, 3.1495999999999986), (13.640001602908706, 2.7129292820317406), (12.483661094857885, 1.523999999999973))
            Line((12.483661094857876, 1.5239999999999954), (17.996338905142114, 1.5239999999999954))
        make_face()
    # profile 29 of 35: a face of its own
    with BuildSketch(Plane(origin=(0, 1.524, 0), x_dir=(1, 0, 0), z_dir=(0, 1, 0))):
        with BuildLine():
            Line((25.40000000000001, 3.149599999999998), (15.240000006751938, 3.149599999999998))
            ThreePointArc((15.240000006751936, 3.1495999999999986), (16.839998402907117, 2.7129292786017642), (17.996338905142117, 1.5239999999999987))
            Line((17.996338905142114, 1.5239999999999954), (22.643661094857876, 1.5239999999999954))
            ThreePointArc((22.643661094857883, 1.5239999999999694), (23.800001600000797, 2.712929280316748), (25.40000000000001, 3.1495999999999986))
        make_face()
    # profile 30 of 35: a face of its own
    with BuildSketch(Plane(origin=(0, 1.524, 0), x_dir=(1, 0, 0), z_dir=(0, 1, 0))):
        with BuildLine():
            ThreePointArc((17.996338905142117, -1.5239999999999978), (16.83999839999927, -2.712929280316718), (15.240000000000155, -3.1495999999999986))
            Line((15.240000000000155, -3.149599999999998), (25.40000000000001, -3.149599999999998))
            ThreePointArc((25.40000000000001, -3.1495999999999986), (23.800001600000794, -2.7129292803167475), (22.643661094857883, -1.5239999999999687))
            Line((22.643661094857876, -1.5239999999999954), (17.996338905142117, -1.5239999999999954))
        make_face()
    # profile 31 of 35: a face of its own
    with BuildSketch(Plane(origin=(0, 1.524, 0), x_dir=(1, 0, 0), z_dir=(0, 1, 0))):
        with BuildLine():
            Line((22.643661094857876, 1.5239999999999954), (17.996338905142114, 1.5239999999999954))
            ThreePointArc((17.996338905142117, 1.5239999999999987), (18.289700409518588, 0.7869609724644582), (18.389600000000005, 0))
            ThreePointArc((18.389600000000005, -7.7e-16), (18.289700409518588, -0.7869609724644566), (17.996338905142117, -1.5239999999999978))
            Line((17.996338905142117, -1.5239999999999954), (22.643661094857876, -1.5239999999999954))
            ThreePointArc((22.643661094857883, -1.5239999999999687), (22.25040000000001, 3.9e-16), (22.643661094857883, 1.5239999999999694))
        make_face()
    # profile 32 of 35: a face of its own
    with BuildSketch(Plane(origin=(0, 1.524, 0), x_dir=(1, 0, 0), z_dir=(0, 1, 0))):
        with BuildLine():
            ThreePointArc((28.54960000000001, 0), (27.62710351802516, 2.227103518025149), (25.40000000000001, 3.1495999999999986))
            ThreePointArc((25.40000000000001, 3.1495999999999986), (23.800001600000797, 2.712929280316748), (22.643661094857883, 1.5239999999999694))
            Line((22.643661094857876, 1.5239999999999954), (25.4, 1.5239999999999954))
            Line((25.4, 1.5239999999999954), (25.4, 1.2700000000000011))
            ThreePointArc((25.399999999999984, 1.2700000000000011), (26.298025612106915, 0.898025612106925), (26.67000000000001, 0))
            ThreePointArc((26.67000000000001, -3.1e-16), (26.298025612106915, -0.8980256121069251), (25.399999999999984, -1.2700000000000011))
            Line((25.4, -1.2700000000000011), (25.4, -1.5239999999999954))
            Line((25.4, -1.5239999999999954), (22.643661094857876, -1.5239999999999954))
            ThreePointArc((22.643661094857883, -1.5239999999999687), (23.800001600000794, -2.7129292803167475), (25.40000000000001, -3.1495999999999986))
            ThreePointArc((25.40000000000001, -3.1495999999999986), (27.62710351802516, -2.2271035180251495), (28.54960000000001, -7.7e-16))
        make_face()
    # profile 33 of 35: a face of its own
    with BuildSketch(Plane(origin=(0, 1.524, 0), x_dir=(1, 0, 0), z_dir=(0, 1, 0))):
        with BuildLine():
            Line((25.4, 1.5239999999999954), (22.643661094857876, 1.5239999999999954))
            ThreePointArc((22.643661094857883, 1.5239999999999694), (22.25040000000001, 3.9e-16), (22.643661094857883, -1.5239999999999687))
            Line((22.643661094857876, -1.5239999999999954), (25.4, -1.5239999999999954))
            Line((25.4, -1.5239999999999954), (25.4, -1.2700000000000011))
            ThreePointArc((25.399999999999984, -1.2700000000000011), (24.13000000000001, 1.6e-16), (25.399999999999984, 1.2700000000000011))
            Line((25.4, 1.2700000000000011), (25.4, 1.5239999999999954))
        make_face()
    # profile 34 of 35: a face of its own
    with BuildSketch(Plane(origin=(0, 1.524, 0), x_dir=(1, 0, 0), z_dir=(0, 1, 0))):
        with BuildLine():
            ThreePointArc((28.54960000000001, 0), (27.62710351802516, 2.227103518025149), (25.40000000000001, 3.1495999999999986))
            ThreePointArc((25.40000000000001, 3.1495999999999986), (23.800001600000797, 2.712929280316748), (22.643661094857883, 1.5239999999999694))
            Line((22.643661094857876, 1.5239999999999954), (25.4, 1.5239999999999954))
            Line((25.4, 1.5239999999999954), (25.4, 1.2700000000000011))
            ThreePointArc((25.399999999999984, 1.2700000000000011), (26.298025612106915, 0.898025612106925), (26.67000000000001, 0))
            ThreePointArc((26.67000000000001, -3.1e-16), (26.298025612106915, -0.8980256121069251), (25.399999999999984, -1.2700000000000011))
            Line((25.4, -1.2700000000000011), (25.4, -1.5239999999999954))
            Line((25.4, -1.5239999999999954), (22.643661094857876, -1.5239999999999954))
            ThreePointArc((22.643661094857883, -1.5239999999999687), (23.800001600000794, -2.7129292803167475), (25.40000000000001, -3.1495999999999986))
            ThreePointArc((25.40000000000001, -3.1495999999999986), (27.62710351802516, -2.2271035180251495), (28.54960000000001, -7.7e-16))
        make_face()
    # profile 35 of 35: a face of its own
    with BuildSketch(Plane(origin=(0, 1.524, 0), x_dir=(1, 0, 0), z_dir=(0, 1, 0))):
        with BuildLine():
            Line((25.4, 1.5239999999999954), (22.643661094857876, 1.5239999999999954))
            ThreePointArc((22.643661094857883, 1.5239999999999694), (22.25040000000001, 3.9e-16), (22.643661094857883, -1.5239999999999687))
            Line((22.643661094857876, -1.5239999999999954), (25.4, -1.5239999999999954))
            Line((25.4, -1.5239999999999954), (25.4, -1.2700000000000011))
            ThreePointArc((25.399999999999984, -1.2700000000000011), (24.13000000000001, 1.6e-16), (25.399999999999984, 1.2700000000000011))
            Line((25.4, 1.2700000000000011), (25.4, 1.5239999999999954))
        make_face()
    extrude(amount=BOSS_EXTRUDE2_DEPTH)

    # Sketch3 → Boss-Extrude3 (add)
    with BuildSketch(Plane(origin=(0, 8.128, 0), x_dir=(1, 0, 0), z_dir=(0, 1, 0))):
        with BuildLine():
            Line((-24.13, -8.889999999999995), (24.13, -8.88999999999999))
            ThreePointArc((24.13, -8.88999999999999), (33.02, 8.03e-15), (24.130000000000003, 8.890000000000006))
            Line((24.130000000000003, 8.890000000000006), (-24.130000000000003, 8.89))
            ThreePointArc((-24.130000000000003, 8.89), (-33.019999999999996, 2.78e-15), (-24.13, -8.889999999999995))
        make_face()
    extrude(amount=BOSS_EXTRUDE3_DEPTH)

    # Fillet1
    fillet1_edges = [part.edges().sort_by_distance(p)[0] for p in [
        (33.02, 0, -6.61e-15),
        (0, 0, -8.890000000000004),
        (0, 0, 8.889999999999993),
        (-33.019999999999996, 0, 6.9e-16),
        (33.02, 9.652000000000001, -6.71e-15),
        (0, 9.652000000000001, 8.889999999999993),
        (0, 9.652000000000001, -8.890000000000004),
        (-33.019999999999996, 9.652000000000001, -1.58e-15),
    ]]
    fillet(fillet1_edges, radius=FILLET1_R - 0.0001)  # a hair under: the kernel refuses the full size

    # Sketch2<3> → Cut-Extrude1 (cut, two sides: drawn at the far end of the back side and taken through both)
    with SkipClean():  # the faces are left unmerged after this step: merging them gives an invalid solid
        with BuildSketch(Plane(origin=(0, 1.524, 0), x_dir=(1, 0, 0), z_dir=(0, 1, 0)).offset(-CUT_EXTRUDE1_DEPTH_BACK)):
            with Locations(Location((-25.399999999999995, 0, 0), (0, 0, 90))):
                Circle(SKETCH2_3_R)
            with Locations(Location((-15.239999999999995, 0, 0), (0, 0, 90))):
                Circle(SKETCH2_3_R)
            with Locations(Location((-5.079999999999994, 0, 0), (0, 0, 90))):
                Circle(SKETCH2_3_R)
            with Locations(Location((5.0800000000000045, 0, 0), (0, 0, 90))):
                Circle(SKETCH2_3_R)
            with Locations(Location((15.240000000000007, 0, 0), (0, 0, 90))):
                Circle(SKETCH2_3_R)
            with Locations(Location((25.40000000000001, 0, 0), (0, 0, 90))):
                Circle(SKETCH2_3_R)
        extrude(amount=CUT_EXTRUDE1_DEPTH + CUT_EXTRUDE1_DEPTH_BACK, mode=Mode.SUBTRACT)

    # Sketch4 → Cut-Extrude2 (cut, two sides: drawn at the far end of the back side and taken through both)
    with BuildSketch(Plane(origin=(0, 9.652, 0), x_dir=(1, 0, 0), z_dir=(0, 1, 0)).offset(-CUT_EXTRUDE2_DEPTH_BACK)):
        with Locations(Location((-25.399999999999995, 0, 0), (0, 0, 270))):
            Circle(SKETCH4_R)
        with Locations(Location((-15.239999999999995, 0, 0), (0, 0, 270))):
            Circle(SKETCH4_R)
        with Locations(Location((-5.079999999999994, 0, 0), (0, 0, 270))):
            Circle(SKETCH4_R)
        with Locations(Location((5.0800000000000045, 0, 0), (0, 0, 270))):
            Circle(SKETCH4_R)
        with Locations(Location((15.240000000000007, 0, 0), (0, 0, 270))):
            Circle(SKETCH4_R)
        with Locations(Location((25.40000000000001, 0, 0), (0, 0, 270))):
            Circle(SKETCH4_R)
    extrude(amount=CUT_EXTRUDE2_DEPTH + CUT_EXTRUDE2_DEPTH_BACK, mode=Mode.SUBTRACT)


solid = part.part
